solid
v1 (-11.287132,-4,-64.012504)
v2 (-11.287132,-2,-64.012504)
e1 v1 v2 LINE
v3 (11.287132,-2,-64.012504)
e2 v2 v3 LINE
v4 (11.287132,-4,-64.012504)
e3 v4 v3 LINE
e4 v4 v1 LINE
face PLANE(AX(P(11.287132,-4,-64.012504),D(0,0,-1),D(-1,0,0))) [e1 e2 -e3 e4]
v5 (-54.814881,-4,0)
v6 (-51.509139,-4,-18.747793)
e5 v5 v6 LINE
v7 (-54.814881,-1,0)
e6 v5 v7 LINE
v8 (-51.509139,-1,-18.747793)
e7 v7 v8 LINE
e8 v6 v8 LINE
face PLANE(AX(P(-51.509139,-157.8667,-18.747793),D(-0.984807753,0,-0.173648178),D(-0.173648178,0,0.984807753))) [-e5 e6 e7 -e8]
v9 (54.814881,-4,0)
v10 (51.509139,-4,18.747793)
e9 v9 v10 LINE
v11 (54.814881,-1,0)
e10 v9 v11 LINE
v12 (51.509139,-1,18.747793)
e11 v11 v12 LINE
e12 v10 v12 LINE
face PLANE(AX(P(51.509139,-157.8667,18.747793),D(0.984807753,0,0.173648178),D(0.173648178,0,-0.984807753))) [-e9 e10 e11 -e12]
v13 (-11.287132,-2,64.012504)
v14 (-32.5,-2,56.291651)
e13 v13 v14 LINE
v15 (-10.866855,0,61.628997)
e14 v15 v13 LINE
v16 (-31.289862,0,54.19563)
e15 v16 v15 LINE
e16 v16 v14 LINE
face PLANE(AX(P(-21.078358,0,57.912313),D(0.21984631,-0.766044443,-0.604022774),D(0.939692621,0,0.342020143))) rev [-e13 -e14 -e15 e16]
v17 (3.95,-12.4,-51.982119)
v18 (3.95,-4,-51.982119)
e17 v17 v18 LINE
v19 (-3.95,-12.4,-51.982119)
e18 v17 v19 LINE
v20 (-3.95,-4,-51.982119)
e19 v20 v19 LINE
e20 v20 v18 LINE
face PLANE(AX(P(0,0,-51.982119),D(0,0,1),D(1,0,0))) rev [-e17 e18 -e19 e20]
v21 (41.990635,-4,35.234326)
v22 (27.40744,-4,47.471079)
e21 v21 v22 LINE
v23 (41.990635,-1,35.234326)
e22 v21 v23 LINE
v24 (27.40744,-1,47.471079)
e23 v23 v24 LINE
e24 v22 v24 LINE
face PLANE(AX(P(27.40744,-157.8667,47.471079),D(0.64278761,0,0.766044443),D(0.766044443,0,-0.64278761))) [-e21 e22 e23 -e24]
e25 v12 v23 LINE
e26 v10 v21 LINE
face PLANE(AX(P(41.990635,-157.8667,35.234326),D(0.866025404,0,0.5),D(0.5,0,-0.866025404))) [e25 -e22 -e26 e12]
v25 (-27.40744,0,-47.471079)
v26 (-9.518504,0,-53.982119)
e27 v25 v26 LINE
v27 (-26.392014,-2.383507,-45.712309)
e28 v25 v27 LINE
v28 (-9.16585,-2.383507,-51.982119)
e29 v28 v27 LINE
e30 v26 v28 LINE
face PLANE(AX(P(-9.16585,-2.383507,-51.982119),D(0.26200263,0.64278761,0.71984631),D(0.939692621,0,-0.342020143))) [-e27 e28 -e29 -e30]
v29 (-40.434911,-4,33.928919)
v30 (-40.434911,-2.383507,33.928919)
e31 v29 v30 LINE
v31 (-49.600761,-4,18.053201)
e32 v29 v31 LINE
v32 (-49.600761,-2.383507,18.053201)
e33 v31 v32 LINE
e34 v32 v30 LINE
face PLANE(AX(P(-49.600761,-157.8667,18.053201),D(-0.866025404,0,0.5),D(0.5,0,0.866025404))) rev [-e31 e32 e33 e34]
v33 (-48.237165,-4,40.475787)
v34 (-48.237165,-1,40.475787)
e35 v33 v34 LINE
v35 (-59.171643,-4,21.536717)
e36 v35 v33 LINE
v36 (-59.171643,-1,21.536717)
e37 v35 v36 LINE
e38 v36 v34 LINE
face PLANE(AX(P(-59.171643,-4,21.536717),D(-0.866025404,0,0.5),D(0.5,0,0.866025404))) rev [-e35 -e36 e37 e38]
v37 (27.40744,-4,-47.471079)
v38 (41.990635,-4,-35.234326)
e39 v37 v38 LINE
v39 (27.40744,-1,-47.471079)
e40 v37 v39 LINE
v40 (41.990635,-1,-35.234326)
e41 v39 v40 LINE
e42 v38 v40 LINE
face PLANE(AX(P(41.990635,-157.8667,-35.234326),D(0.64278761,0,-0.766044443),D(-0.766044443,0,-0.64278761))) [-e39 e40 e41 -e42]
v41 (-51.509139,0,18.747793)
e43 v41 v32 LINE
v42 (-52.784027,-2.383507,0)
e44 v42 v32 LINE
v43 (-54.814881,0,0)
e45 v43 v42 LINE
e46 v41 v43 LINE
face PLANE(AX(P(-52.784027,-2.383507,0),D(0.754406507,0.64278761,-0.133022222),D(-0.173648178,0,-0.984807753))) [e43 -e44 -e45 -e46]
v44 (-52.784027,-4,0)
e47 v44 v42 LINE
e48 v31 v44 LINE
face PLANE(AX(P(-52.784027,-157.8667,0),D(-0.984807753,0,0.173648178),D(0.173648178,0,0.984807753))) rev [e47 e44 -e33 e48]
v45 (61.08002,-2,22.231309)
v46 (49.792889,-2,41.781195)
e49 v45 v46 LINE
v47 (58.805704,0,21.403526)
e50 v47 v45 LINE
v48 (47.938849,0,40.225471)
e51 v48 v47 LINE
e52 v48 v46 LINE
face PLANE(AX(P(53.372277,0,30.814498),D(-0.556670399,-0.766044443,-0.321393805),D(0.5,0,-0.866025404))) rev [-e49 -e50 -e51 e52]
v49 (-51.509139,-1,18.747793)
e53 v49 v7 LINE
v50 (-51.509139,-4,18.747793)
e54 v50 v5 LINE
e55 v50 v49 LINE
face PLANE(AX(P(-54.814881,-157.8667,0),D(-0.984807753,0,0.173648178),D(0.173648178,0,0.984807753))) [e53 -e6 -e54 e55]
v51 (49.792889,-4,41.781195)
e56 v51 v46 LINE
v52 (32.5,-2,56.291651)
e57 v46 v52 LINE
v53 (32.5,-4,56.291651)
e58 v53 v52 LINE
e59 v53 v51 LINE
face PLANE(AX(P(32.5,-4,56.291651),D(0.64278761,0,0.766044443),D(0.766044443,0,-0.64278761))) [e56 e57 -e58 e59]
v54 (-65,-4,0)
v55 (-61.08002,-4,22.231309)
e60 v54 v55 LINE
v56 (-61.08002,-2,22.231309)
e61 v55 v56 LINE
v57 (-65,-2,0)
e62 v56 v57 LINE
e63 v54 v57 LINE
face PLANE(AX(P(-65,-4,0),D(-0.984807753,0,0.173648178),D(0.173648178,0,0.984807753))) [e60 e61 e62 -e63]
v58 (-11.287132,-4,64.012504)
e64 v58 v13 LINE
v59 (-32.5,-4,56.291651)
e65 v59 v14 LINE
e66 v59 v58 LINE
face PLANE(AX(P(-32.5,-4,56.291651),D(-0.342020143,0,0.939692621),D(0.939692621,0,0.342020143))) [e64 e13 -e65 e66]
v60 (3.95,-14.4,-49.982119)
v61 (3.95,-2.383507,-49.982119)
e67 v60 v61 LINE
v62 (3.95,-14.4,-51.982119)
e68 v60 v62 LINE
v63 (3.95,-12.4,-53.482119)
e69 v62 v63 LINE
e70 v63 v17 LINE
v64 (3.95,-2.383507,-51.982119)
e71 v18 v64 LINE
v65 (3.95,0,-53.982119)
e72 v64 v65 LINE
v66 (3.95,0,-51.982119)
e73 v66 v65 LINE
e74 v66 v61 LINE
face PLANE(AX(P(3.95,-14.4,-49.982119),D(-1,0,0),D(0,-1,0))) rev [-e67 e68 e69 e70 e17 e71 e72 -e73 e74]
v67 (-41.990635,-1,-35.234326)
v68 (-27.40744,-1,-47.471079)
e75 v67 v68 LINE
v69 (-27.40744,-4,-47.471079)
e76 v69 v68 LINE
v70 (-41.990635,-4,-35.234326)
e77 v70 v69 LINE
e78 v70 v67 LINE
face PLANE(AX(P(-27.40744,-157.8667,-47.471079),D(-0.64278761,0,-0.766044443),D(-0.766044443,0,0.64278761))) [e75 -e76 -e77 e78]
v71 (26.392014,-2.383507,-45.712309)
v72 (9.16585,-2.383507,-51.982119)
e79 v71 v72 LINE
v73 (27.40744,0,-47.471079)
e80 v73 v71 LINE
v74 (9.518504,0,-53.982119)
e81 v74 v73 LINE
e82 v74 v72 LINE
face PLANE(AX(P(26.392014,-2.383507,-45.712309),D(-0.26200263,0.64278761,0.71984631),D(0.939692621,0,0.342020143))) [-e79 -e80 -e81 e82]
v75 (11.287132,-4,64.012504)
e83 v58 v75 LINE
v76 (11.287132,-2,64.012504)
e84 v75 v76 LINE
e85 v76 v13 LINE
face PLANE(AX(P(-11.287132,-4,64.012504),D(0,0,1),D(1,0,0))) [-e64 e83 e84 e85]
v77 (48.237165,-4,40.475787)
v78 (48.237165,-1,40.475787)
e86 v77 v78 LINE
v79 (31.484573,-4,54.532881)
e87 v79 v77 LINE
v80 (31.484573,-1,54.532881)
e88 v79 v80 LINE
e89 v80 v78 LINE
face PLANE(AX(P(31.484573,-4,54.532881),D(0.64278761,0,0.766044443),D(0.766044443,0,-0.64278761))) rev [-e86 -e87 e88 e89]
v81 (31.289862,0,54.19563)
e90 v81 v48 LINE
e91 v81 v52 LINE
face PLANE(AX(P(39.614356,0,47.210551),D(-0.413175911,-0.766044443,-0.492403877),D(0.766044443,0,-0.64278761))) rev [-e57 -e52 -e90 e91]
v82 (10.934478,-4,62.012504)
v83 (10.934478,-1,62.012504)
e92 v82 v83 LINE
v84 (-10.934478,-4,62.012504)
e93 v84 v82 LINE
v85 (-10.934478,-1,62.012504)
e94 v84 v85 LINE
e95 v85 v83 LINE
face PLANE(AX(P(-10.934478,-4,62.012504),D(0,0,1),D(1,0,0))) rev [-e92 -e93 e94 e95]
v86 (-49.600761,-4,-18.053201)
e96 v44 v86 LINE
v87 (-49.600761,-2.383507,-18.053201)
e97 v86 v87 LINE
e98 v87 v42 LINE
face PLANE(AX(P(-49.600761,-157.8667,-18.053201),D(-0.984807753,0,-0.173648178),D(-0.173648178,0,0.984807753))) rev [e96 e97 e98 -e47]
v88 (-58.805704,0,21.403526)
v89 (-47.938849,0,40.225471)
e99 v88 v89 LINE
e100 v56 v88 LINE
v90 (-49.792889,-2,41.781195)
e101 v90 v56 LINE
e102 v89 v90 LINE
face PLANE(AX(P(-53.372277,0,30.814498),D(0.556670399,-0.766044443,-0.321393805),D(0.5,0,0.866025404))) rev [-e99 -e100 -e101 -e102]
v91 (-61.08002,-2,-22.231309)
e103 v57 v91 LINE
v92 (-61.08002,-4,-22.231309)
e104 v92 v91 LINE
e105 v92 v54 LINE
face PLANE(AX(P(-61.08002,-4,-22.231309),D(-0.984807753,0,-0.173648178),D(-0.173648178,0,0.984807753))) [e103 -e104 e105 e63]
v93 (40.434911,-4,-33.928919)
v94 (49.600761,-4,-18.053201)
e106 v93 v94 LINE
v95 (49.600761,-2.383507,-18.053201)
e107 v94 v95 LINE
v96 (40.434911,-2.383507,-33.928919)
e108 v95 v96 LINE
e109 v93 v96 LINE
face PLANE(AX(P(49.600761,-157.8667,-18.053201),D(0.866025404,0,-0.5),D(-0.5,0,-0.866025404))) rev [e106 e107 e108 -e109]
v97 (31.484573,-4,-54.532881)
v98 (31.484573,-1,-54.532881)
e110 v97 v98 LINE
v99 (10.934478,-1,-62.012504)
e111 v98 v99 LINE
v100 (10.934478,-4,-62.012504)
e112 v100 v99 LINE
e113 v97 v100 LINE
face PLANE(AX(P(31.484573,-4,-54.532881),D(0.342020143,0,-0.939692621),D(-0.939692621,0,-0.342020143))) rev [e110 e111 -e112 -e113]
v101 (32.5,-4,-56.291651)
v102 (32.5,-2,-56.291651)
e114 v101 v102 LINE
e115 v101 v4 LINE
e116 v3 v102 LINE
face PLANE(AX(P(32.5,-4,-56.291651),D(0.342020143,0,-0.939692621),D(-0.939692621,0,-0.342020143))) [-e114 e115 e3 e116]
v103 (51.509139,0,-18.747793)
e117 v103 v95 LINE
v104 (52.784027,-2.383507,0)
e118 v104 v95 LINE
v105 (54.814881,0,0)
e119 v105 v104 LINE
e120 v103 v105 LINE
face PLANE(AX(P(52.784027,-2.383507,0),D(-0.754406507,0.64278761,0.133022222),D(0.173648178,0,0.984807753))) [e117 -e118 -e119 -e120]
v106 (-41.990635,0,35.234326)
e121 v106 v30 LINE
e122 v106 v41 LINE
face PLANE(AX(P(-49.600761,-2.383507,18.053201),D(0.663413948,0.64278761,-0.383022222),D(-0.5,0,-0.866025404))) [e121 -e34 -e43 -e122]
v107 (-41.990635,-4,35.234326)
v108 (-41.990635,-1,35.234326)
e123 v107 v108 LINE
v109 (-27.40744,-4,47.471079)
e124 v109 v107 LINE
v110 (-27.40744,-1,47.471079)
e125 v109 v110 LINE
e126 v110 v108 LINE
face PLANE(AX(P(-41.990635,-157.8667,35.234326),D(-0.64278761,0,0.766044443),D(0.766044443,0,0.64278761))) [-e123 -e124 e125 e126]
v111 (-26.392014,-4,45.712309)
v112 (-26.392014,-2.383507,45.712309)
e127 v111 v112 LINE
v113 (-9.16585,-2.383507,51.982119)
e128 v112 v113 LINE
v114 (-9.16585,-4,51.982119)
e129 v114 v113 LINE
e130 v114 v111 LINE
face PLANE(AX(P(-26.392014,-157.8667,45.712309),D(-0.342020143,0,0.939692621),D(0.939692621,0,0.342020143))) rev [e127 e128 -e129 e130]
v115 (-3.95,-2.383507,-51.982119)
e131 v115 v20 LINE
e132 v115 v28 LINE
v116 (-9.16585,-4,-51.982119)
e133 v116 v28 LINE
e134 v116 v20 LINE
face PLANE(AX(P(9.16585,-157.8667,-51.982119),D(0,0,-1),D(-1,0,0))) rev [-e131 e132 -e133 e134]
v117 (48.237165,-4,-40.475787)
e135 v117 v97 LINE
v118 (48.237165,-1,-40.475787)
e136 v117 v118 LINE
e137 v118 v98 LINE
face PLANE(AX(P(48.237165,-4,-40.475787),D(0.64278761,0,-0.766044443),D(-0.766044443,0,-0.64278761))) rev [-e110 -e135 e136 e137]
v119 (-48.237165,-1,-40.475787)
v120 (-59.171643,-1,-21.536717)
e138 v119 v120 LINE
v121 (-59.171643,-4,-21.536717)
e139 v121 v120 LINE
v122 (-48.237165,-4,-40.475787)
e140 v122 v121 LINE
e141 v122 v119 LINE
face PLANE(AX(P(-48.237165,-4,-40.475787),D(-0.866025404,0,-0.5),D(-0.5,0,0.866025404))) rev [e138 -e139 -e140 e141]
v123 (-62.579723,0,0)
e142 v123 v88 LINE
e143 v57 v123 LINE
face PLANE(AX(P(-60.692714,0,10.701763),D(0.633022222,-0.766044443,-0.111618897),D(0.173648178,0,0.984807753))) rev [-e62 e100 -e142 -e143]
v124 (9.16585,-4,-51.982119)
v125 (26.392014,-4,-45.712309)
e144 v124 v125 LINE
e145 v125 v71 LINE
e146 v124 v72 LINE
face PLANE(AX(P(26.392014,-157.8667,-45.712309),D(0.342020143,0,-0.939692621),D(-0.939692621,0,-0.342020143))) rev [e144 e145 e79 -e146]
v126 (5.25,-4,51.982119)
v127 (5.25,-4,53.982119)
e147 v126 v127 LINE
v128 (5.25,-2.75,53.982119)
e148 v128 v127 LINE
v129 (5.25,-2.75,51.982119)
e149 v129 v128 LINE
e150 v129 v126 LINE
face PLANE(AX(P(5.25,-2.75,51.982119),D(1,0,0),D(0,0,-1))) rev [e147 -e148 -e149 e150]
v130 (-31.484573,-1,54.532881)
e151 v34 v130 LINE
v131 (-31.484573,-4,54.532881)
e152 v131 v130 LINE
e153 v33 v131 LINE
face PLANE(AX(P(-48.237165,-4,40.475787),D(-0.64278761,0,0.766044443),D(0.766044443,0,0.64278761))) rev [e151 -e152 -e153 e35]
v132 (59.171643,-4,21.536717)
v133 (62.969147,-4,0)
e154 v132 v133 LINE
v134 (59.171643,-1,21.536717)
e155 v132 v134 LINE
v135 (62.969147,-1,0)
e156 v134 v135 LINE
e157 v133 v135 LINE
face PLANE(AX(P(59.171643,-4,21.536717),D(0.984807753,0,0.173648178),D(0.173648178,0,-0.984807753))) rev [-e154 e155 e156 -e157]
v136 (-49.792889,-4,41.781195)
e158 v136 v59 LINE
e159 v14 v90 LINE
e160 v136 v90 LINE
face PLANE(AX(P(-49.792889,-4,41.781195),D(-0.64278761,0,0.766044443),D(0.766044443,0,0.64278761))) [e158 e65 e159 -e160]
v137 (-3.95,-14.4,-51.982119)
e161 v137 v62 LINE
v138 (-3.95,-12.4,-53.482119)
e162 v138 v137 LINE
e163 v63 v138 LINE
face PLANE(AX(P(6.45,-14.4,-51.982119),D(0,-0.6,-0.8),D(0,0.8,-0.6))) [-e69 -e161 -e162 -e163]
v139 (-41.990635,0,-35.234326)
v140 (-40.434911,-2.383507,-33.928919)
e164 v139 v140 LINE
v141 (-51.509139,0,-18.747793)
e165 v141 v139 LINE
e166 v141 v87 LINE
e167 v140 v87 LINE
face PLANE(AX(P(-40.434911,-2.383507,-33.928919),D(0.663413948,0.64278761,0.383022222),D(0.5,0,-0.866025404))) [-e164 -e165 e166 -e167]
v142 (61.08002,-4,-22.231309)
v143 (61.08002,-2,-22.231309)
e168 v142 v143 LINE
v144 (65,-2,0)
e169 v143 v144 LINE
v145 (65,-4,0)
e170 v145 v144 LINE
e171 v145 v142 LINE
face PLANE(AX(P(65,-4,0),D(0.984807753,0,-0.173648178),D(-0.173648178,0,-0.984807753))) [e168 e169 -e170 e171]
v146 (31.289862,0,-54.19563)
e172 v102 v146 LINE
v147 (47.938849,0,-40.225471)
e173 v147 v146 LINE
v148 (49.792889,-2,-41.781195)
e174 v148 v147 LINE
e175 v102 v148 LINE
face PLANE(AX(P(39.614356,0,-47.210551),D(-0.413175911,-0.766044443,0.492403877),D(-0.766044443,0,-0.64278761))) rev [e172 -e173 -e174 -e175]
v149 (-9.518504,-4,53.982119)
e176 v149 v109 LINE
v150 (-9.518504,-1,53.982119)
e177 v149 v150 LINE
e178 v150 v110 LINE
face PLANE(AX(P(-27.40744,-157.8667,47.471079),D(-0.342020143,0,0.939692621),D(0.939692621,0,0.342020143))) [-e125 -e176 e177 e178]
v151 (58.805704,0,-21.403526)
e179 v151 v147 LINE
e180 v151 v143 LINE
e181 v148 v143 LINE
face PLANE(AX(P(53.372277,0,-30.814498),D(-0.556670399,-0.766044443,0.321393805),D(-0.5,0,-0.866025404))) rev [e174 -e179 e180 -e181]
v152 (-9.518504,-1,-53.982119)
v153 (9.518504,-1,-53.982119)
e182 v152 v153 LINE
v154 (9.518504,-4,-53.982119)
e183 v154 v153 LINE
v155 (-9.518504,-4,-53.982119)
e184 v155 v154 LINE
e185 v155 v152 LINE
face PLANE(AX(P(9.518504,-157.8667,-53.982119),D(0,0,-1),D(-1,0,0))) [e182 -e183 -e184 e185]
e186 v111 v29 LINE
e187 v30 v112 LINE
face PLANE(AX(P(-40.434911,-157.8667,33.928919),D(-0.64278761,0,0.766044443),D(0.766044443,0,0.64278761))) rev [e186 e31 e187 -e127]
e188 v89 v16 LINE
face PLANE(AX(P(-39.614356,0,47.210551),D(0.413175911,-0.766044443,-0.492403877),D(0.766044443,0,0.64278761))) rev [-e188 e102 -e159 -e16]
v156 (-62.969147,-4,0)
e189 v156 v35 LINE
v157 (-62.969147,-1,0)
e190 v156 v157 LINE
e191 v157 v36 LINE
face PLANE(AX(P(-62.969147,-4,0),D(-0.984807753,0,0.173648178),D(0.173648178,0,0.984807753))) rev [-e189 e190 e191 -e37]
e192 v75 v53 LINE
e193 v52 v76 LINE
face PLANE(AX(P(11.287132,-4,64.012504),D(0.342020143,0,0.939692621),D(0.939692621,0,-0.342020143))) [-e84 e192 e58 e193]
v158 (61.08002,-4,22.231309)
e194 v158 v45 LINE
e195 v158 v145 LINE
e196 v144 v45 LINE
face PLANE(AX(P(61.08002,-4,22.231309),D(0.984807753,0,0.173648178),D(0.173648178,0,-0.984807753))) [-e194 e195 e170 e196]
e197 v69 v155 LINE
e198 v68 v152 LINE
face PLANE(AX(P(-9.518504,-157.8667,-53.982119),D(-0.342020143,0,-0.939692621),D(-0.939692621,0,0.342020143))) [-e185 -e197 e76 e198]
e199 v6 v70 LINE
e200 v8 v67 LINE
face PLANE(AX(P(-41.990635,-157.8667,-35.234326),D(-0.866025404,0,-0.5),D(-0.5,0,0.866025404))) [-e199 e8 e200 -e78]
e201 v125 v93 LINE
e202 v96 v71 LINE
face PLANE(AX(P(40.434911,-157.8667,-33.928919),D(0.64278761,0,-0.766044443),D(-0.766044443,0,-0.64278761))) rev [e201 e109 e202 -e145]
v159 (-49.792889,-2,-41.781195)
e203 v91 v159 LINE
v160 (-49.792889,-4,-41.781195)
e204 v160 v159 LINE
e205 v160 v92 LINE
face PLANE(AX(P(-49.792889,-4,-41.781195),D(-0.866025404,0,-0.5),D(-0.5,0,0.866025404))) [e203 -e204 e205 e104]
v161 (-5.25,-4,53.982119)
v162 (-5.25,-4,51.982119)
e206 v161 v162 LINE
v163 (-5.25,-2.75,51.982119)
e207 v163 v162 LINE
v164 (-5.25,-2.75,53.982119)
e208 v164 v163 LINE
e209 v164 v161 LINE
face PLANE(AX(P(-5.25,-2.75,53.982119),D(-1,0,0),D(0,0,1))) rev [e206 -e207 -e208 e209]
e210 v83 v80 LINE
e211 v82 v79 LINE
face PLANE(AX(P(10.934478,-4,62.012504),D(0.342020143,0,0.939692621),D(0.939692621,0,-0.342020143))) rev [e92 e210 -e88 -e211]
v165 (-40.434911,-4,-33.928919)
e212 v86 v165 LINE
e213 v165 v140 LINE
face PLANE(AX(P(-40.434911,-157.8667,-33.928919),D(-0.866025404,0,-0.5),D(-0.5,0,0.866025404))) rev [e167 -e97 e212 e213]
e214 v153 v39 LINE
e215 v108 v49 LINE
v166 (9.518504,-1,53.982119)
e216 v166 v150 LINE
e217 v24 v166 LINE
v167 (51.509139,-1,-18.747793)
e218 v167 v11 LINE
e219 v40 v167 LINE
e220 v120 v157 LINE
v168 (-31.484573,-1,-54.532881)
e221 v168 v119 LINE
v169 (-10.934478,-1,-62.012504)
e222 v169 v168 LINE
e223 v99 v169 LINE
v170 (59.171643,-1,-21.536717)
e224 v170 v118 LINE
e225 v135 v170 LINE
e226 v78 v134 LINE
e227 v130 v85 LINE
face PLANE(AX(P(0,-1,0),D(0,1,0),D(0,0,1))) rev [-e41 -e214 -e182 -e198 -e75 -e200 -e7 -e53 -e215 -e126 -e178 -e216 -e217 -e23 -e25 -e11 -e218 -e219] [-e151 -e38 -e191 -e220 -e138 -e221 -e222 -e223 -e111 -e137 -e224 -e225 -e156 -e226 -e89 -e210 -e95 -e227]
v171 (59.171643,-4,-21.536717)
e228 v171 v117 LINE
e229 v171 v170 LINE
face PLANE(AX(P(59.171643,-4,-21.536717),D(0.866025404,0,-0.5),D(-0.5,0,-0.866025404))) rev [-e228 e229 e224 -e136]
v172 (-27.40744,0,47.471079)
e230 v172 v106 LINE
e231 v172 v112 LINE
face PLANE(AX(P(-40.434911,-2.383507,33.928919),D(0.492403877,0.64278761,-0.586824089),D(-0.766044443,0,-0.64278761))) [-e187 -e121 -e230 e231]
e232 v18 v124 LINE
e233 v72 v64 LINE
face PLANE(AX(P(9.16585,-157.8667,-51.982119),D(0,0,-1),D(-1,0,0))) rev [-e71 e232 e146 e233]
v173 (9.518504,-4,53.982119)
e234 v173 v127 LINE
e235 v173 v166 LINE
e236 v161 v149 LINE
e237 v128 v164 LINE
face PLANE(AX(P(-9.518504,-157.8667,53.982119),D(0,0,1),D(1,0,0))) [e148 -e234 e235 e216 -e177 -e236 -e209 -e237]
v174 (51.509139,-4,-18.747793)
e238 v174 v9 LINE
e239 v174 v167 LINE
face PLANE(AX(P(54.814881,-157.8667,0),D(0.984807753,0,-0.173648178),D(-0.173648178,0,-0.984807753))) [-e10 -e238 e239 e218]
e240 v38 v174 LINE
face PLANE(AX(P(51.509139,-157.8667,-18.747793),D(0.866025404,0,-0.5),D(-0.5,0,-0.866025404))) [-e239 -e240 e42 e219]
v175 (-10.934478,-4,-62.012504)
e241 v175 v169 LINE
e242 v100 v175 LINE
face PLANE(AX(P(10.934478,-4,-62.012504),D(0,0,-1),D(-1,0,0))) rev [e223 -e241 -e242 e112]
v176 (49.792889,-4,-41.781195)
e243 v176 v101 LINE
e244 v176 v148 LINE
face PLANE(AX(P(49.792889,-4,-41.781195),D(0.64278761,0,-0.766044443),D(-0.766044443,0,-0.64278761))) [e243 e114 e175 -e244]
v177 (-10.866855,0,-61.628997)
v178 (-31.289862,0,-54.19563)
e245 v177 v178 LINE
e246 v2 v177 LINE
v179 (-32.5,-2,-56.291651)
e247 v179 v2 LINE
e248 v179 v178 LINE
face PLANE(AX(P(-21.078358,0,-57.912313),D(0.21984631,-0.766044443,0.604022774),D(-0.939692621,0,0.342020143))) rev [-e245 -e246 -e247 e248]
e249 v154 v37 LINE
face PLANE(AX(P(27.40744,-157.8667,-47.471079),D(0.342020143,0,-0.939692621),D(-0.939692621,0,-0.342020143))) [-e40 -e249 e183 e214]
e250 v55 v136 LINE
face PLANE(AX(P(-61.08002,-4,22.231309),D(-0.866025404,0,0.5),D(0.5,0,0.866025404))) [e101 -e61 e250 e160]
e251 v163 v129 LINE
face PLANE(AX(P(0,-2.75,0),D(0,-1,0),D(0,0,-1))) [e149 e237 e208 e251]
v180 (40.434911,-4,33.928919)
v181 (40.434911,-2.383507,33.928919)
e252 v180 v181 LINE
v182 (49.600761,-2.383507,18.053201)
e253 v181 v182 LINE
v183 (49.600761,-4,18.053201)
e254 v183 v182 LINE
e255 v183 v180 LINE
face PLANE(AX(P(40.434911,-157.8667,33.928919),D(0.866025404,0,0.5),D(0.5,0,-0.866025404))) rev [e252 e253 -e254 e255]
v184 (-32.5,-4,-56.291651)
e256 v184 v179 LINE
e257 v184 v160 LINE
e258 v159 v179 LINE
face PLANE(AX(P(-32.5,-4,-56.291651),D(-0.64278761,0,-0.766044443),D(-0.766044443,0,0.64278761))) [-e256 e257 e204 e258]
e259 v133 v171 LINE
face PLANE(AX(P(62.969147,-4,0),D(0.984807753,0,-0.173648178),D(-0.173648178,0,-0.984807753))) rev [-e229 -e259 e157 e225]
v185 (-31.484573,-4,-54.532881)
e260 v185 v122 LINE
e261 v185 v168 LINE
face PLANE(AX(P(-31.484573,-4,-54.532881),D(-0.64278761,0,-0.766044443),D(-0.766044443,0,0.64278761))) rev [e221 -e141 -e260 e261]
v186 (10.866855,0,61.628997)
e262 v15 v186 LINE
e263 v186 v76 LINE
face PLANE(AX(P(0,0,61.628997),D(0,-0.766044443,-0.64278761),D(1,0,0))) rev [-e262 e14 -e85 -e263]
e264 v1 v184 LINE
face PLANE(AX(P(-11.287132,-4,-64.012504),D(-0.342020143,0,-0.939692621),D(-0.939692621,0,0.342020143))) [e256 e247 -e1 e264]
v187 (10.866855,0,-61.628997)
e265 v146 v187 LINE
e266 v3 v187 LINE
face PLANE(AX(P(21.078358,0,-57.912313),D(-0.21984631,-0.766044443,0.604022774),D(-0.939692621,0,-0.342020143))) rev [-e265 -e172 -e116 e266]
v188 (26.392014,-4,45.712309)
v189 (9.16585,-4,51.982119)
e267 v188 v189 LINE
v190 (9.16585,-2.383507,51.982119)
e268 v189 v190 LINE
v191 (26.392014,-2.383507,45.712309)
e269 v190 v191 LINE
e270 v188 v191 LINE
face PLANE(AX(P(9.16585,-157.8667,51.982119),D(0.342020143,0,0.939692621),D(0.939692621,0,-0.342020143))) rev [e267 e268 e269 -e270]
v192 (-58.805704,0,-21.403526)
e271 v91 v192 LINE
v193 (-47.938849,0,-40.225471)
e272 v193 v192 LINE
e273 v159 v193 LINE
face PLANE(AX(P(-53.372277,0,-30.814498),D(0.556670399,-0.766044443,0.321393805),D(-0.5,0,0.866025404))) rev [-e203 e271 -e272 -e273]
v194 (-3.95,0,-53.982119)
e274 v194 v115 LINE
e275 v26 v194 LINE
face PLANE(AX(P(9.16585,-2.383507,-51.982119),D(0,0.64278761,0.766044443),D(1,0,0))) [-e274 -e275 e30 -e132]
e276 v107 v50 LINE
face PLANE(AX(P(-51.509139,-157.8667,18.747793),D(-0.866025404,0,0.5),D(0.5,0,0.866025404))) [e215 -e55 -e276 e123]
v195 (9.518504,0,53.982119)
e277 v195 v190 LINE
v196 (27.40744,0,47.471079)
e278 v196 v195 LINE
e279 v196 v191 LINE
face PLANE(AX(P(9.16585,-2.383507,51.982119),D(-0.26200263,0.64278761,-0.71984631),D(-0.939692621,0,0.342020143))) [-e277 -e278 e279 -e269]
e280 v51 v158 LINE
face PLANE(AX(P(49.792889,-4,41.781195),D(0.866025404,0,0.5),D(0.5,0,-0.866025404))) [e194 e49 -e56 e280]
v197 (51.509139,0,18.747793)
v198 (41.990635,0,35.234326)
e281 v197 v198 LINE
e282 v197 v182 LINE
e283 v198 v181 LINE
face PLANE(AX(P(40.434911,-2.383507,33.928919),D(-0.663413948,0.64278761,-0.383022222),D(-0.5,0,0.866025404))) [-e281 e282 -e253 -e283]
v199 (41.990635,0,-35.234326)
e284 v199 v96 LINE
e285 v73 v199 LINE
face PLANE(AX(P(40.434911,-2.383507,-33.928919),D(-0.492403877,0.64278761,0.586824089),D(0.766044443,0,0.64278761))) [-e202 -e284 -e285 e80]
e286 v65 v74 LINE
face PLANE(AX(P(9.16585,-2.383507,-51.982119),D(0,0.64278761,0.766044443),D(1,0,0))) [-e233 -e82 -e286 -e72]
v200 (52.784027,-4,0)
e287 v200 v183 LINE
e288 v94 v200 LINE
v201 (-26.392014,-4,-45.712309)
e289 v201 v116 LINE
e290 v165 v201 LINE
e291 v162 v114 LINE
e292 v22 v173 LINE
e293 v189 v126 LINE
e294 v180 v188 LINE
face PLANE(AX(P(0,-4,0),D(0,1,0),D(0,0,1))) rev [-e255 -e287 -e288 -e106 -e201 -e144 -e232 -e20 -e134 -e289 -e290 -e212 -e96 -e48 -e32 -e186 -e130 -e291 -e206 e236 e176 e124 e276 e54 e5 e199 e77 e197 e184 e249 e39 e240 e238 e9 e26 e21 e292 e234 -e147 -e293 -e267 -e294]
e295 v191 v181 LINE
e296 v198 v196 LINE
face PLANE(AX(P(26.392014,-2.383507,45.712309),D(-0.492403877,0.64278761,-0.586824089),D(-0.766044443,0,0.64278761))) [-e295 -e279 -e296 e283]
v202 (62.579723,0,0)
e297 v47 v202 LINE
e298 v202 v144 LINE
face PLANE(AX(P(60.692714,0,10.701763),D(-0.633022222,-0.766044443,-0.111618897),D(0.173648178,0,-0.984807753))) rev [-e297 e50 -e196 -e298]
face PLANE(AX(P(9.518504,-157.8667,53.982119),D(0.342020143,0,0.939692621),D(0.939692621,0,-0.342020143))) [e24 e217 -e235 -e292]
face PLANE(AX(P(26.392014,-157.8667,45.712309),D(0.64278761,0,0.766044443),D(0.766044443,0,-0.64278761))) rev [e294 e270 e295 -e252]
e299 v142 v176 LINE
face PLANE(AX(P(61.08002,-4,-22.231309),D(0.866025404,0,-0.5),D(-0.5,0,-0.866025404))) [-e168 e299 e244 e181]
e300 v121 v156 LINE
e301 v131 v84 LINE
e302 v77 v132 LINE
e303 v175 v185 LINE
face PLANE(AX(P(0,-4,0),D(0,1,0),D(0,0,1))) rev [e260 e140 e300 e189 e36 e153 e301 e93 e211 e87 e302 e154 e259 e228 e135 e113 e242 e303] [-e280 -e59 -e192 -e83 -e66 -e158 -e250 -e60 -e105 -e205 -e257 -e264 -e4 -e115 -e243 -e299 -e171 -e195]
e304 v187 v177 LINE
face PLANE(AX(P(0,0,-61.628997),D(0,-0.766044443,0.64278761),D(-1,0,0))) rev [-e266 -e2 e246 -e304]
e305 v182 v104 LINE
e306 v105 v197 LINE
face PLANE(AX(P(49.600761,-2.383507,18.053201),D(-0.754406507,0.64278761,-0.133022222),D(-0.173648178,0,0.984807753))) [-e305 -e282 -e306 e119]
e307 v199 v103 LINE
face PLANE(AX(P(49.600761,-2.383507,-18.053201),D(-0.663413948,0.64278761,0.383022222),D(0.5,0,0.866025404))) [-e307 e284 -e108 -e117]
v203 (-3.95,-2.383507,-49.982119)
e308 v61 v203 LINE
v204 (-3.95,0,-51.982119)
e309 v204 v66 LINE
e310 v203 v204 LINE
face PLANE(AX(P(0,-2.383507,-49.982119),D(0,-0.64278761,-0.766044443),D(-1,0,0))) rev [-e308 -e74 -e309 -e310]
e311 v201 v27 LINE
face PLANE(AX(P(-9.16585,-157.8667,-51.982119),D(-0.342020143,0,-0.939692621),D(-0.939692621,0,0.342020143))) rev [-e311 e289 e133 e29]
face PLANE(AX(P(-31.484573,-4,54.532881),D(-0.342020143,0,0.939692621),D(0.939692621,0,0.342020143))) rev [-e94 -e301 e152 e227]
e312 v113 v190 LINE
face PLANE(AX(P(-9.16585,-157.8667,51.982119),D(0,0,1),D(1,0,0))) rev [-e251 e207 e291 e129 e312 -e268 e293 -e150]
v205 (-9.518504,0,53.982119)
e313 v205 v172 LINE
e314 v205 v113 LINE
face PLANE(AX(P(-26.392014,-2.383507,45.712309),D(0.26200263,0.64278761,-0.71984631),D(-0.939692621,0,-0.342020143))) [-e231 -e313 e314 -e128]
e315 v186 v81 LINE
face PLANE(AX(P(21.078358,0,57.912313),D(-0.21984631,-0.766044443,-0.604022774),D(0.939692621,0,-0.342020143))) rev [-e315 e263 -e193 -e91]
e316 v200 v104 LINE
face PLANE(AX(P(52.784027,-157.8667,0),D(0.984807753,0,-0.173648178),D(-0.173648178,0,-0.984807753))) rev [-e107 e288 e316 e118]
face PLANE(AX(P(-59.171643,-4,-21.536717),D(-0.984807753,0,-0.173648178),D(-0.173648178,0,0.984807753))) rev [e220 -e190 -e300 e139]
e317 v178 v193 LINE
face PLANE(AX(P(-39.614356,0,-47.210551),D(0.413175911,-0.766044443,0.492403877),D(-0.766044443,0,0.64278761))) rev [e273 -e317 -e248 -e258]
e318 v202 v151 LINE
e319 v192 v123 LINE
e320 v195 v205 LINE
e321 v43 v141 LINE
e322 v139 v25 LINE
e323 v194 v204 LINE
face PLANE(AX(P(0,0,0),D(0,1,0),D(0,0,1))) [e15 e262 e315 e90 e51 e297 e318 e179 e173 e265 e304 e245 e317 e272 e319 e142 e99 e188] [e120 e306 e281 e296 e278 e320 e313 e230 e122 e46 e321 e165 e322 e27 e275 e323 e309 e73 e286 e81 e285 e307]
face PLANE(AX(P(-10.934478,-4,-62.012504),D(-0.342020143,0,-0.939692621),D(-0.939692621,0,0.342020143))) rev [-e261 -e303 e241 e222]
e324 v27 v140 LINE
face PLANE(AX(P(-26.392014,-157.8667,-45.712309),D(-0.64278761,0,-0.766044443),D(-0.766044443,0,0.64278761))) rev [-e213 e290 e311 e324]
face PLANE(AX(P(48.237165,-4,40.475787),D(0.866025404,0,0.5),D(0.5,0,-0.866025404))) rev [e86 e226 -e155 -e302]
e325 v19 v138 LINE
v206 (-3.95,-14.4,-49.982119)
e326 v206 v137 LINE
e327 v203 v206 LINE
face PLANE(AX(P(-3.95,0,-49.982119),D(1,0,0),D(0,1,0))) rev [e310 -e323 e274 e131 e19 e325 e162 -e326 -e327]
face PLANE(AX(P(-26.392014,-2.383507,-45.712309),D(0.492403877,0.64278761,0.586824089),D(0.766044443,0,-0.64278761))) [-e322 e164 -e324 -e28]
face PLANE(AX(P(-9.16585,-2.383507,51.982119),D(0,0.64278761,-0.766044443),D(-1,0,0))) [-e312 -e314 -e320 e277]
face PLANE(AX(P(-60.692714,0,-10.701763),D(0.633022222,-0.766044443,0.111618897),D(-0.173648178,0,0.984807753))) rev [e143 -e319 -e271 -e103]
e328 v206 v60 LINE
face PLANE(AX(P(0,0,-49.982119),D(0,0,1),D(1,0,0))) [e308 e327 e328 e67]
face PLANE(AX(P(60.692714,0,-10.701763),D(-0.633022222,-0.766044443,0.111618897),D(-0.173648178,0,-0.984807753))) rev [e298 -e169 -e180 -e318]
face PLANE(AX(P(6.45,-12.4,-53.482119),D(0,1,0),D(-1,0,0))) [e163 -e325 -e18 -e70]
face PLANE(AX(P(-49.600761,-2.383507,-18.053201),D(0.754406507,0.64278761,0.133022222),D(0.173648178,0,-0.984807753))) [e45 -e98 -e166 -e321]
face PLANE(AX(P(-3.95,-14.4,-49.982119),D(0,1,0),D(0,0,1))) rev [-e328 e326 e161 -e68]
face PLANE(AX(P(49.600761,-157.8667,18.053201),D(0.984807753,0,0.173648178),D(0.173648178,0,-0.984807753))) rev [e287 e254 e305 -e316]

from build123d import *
from OCP.BRepFilletAPI import BRepFilletAPI_MakeChamfer

# Parameters (mm, degrees)
BOSS_EXTRUDE1_DEPTH = 1
BOSS_EXTRUDE3_DEPTH = 4
CUT_EXTRUDE2_DEPTH  = 1
BOSS_EXTRUDE5_DEPTH = 4
SKETCH6_W           = 10.5
SKETCH6_H           = 2
CUT_EXTRUDE3_DEPTH  = 1.25
SKETCH7_W           = 7.9
SKETCH7_H           = 14.4
BOSS_EXTRUDE6_DEPTH = 2
CHAMFER1_SIZE       = 2.383507185
CHAMFER1_SIZE_2     = 2
BOSS_EXTRUDE7_DEPTH = 7.9


with BuildPart() as part:
    # Sketch1 → Boss-Extrude1 (new body)
    with BuildSketch(Plane(origin=(0, 0, 0), x_dir=(1, 0, 0), z_dir=(0, 1, 0))):
        Polygon((62.969146776, 0), (59.171642563, 21.536716606), (48.237164976, 40.47578734), (31.484573388, 54.532880763), (10.934477587, 62.012503946), (-10.934477587, 62.012503946), (-31.484573388, 54.532880763), (-48.237164976, 40.47578734), (-59.171642563, 21.536716606), (-62.969146776, 0), (-59.171642563, -21.536716606), (-48.237164976, -40.47578734), (-31.484573388, -54.532880763), (-10.934477587, -62.012503946), (10.934477587, -62.012503946), (31.484573388, -54.532880763), (48.237164976, -40.47578734), (59.171642563, -21.536716606), align=None)
    extrude(amount=-BOSS_EXTRUDE1_DEPTH)

    # Sketch3 → Cut-Extrude2 (cut)
    with BuildSketch(Plane(origin=(0, 0, 0), x_dir=(1, 0, 0), z_dir=(0, 1, 0))):
        Polygon((54.814880655, 0), (51.509138861, 18.747793338), (41.990634726, 35.234326111), (27.407440327, 47.471079153), (9.518504135, 53.982119449), (-9.518504135, 53.982119449), (-27.407440328, 47.471079153), (-41.990634726, 35.234326111), (-51.509138861, 18.747793338), (-54.814880655, 0), (-51.509138861, -18.747793338), (-41.990634726, -35.234326111), (-27.407440327, -47.471079153), (-9.518504135, -53.982119449), (9.518504135, -53.982119449), (27.407440328, -47.471079153), (41.990634726, -35.234326111), (51.509138861, -18.747793338), align=None)
    extrude(amount=-CUT_EXTRUDE2_DEPTH, mode=Mode.SUBTRACT)


with BuildPart() as body_2:
    # Sketch1<7> → Boss-Extrude3 (new body)
    with BuildSketch(Plane(origin=(0, 0, 0), x_dir=(1, 0, 0), z_dir=(0, 1, 0))):
        Polygon((65, 0), (61.080020351, 22.231309316), (49.792888803, 41.78119463), (32.5, 56.291651246), (11.287131548, 64.012503946), (-11.287131548, 64.012503946), (-32.5, 56.291651246), (-49.792888803, 41.78119463), (-61.080020351, 22.231309316), (-65, 0), (-61.080020351, -22.231309316), (-49.792888803, -41.78119463), (-32.5, -56.291651246), (-11.287131548, -64.012503946), (11.287131548, -64.012503946), (32.5, -56.291651246), (49.792888803, -41.78119463), (61.080020351, -22.231309316), align=None)
        Polygon((62.969146776, 0), (59.171642563, 21.536716606), (48.237164976, 40.47578734), (31.484573388, 54.532880763), (10.934477587, 62.012503946), (-10.934477587, 62.012503946), (-31.484573388, 54.532880763), (-48.237164976, 40.47578734), (-59.171642563, 21.536716606), (-62.969146776, 0), (-59.171642563, -21.536716606), (-48.237164976, -40.47578734), (-31.484573388, -54.532880763), (-10.934477587, -62.012503946), (10.934477587, -62.012503946), (31.484573388, -54.532880763), (48.237164976, -40.47578734), (59.171642563, -21.536716606), align=None, mode=Mode.SUBTRACT)
    extrude(amount=-BOSS_EXTRUDE3_DEPTH)


    add(part.part)  # Boss-Extrude5 merges part
    # Sketch5 → Boss-Extrude5 (add)
    with BuildSketch(Plane(origin=(0, 0, 0), x_dir=(1, 0, 0), z_dir=(0, 1, 0))):
        Polygon((54.814880655, 0), (51.509138861, 18.747793338), (41.990634726, 35.234326111), (27.407440328, 47.471079153), (9.518504135, 53.982119449), (-9.518504135, 53.982119449), (-27.407440328, 47.471079153), (-41.990634726, 35.234326111), (-51.509138861, 18.747793338), (-54.814880655, 0), (-51.509138861, -18.747793338), (-41.990634726, -35.234326111), (-27.407440328, -47.471079153), (-9.518504135, -53.982119449), (9.518504135, -53.982119449), (27.407440328, -47.471079153), (41.990634726, -35.234326111), (51.509138861, -18.747793338), align=None)
        Polygon((52.784027431, 0), (49.600761072, 18.053200627), (40.434910899, 33.928918822), (26.392013716, 45.712308669), (9.165850173, 51.982119449), (-9.165850173, 51.982119449), (-26.392013716, 45.712308669), (-40.434910899, 33.928918822), (-49.600761072, 18.053200627), (-52.784027431, 0), (-49.600761072, -18.053200627), (-40.434910899, -33.928918822), (-26.392013716, -45.712308669), (-9.165850173, -51.982119449), (9.165850173, -51.982119449), (26.392013716, -45.712308669), (40.434910899, -33.928918822), (49.600761072, -18.053200627), align=None, mode=Mode.SUBTRACT)
    extrude(amount=-BOSS_EXTRUDE5_DEPTH)

    # Sketch6 → Cut-Extrude3 (cut)
    with BuildSketch(Plane.XZ.offset(4)):
        with Locations((0, 52.982119449)):
            Rectangle(SKETCH6_W, SKETCH6_H)
    extrude(amount=-CUT_EXTRUDE3_DEPTH, mode=Mode.SUBTRACT)

    # Sketch7 → Boss-Extrude6 (add)
    with BuildSketch(Plane.XY.offset(-51.982119449)):
        with Locations((0, -7.2)):
            Rectangle(SKETCH7_W, SKETCH7_H)
    extrude(amount=BOSS_EXTRUDE6_DEPTH)

    # Chamfer1
    chamfer1_edges_1 = [body_2.edges().sort_by_distance(p)[0] for p in [
        (55.436454577, 0, 32.006251973),
    ]]
    chamfer1_side_1 = [body_2.faces().sort_by_distance(p)[0] for p in [
        (55.401813561, 0, 31.986251973),
    ]]
    chamfer1_edges_2 = [body_2.edges().sort_by_distance(p)[0] for p in [
        (41.146444401, 0, 49.036422938),
    ]]
    chamfer1_side_2 = [body_2.faces().sort_by_distance(p)[0] for p in [
        (41.120732897, 0, 49.00578116),
    ]]
    chamfer1_edges_3 = [body_2.edges().sort_by_distance(p)[0] for p in [
        (21.893565774, 0, 60.152077596),
    ]]
    chamfer1_side_3 = [body_2.faces().sort_by_distance(p)[0] for p in [
        (21.879884968, 0, 60.114489891),
    ]]
    chamfer1_edges_4 = [body_2.edges().sort_by_distance(p)[0] for p in [
        (0, 0, 64.012503946),
    ]]
    chamfer1_side_4 = [body_2.faces().sort_by_distance(p)[0] for p in [
        (0, 0, 63.972503946),
    ]]
    chamfer1_edges_5 = [body_2.edges().sort_by_distance(p)[0] for p in [
        (-21.893565774, 0, 60.152077596),
    ]]
    chamfer1_side_5 = [body_2.faces().sort_by_distance(p)[0] for p in [
        (-21.879884968, 0, 60.114489891),
    ]]
    chamfer1_edges_6 = [body_2.edges().sort_by_distance(p)[0] for p in [
        (-41.146444401, 0, 49.036422938),
    ]]
    chamfer1_side_6 = [body_2.faces().sort_by_distance(p)[0] for p in [
        (-41.120732897, 0, 49.00578116),
    ]]
    chamfer1_edges_7 = [body_2.edges().sort_by_distance(p)[0] for p in [
        (51.192394252, 0, -9.026600314),
    ]]
    chamfer1_side_7 = [body_2.faces().sort_by_distance(p)[0] for p in [
        (51.231786562, 0, -9.033546241),
    ]]
    chamfer1_edges_8 = [body_2.edges().sort_by_distance(p)[0] for p in [
        (45.017835986, 0, -25.991059725),
    ]]
    chamfer1_side_8 = [body_2.faces().sort_by_distance(p)[0] for p in [
        (45.052477002, 0, -26.011059725),
    ]]
    chamfer1_edges_9 = [body_2.edges().sort_by_distance(p)[0] for p in [
        (33.413462307, 0, -39.820613746),
    ]]
    chamfer1_side_9 = [body_2.faces().sort_by_distance(p)[0] for p in [
        (33.439173812, 0, -39.851255524),
    ]]
    chamfer1_edges_10 = [body_2.edges().sort_by_distance(p)[0] for p in [
        (17.778931944, 0, -48.847214059),
    ]]
    chamfer1_side_10 = [body_2.faces().sort_by_distance(p)[0] for p in [
        (17.79261275, 0, -48.884801764),
    ]]
    chamfer1_edges_11 = [body_2.edges().sort_by_distance(p)[0] for p in [
        (6.557925087, 0, -51.982119449),
    ]]
    chamfer1_side_11 = [body_2.faces().sort_by_distance(p)[0] for p in [
        (6.557925087, 0, -52.022119449),
    ]]
    chamfer1_edges_12 = [body_2.edges().sort_by_distance(p)[0] for p in [
        (-17.778931944, 0, -48.847214059),
    ]]
    chamfer1_side_12 = [body_2.faces().sort_by_distance(p)[0] for p in [
        (-17.79261275, 0, -48.884801764),
    ]]
    chamfer1_edges_13 = [body_2.edges().sort_by_distance(p)[0] for p in [
        (-33.413462307, 0, -39.820613746),
    ]]
    chamfer1_side_13 = [body_2.faces().sort_by_distance(p)[0] for p in [
        (-33.439173812, 0, -39.851255524),
    ]]
    chamfer1_edges_14 = [body_2.edges().sort_by_distance(p)[0] for p in [
        (-45.017835986, 0, -25.991059725),
    ]]
    chamfer1_side_14 = [body_2.faces().sort_by_distance(p)[0] for p in [
        (-45.052477002, 0, -26.011059725),
    ]]
    chamfer1_edges_15 = [body_2.edges().sort_by_distance(p)[0] for p in [
        (-51.192394252, 0, -9.026600314),
    ]]
    chamfer1_side_15 = [body_2.faces().sort_by_distance(p)[0] for p in [
        (-51.231786562, 0, -9.033546241),
    ]]
    chamfer1_edges_16 = [body_2.edges().sort_by_distance(p)[0] for p in [
        (-51.192394252, 0, 9.026600314),
    ]]
    chamfer1_side_16 = [body_2.faces().sort_by_distance(p)[0] for p in [
        (-51.231786562, 0, 9.033546241),
    ]]
    chamfer1_edges_17 = [body_2.edges().sort_by_distance(p)[0] for p in [
        (-45.017835986, 0, 25.991059725),
    ]]
    chamfer1_side_17 = [body_2.faces().sort_by_distance(p)[0] for p in [
        (-45.052477002, 0, 26.011059725),
    ]]
    chamfer1_edges_18 = [body_2.edges().sort_by_distance(p)[0] for p in [
        (-33.413462307, 0, 39.820613746),
    ]]
    chamfer1_side_18 = [body_2.faces().sort_by_distance(p)[0] for p in [
        (-33.439173812, 0, 39.851255524),
    ]]
    chamfer1_edges_19 = [body_2.edges().sort_by_distance(p)[0] for p in [
        (-17.778931944, 0, 48.847214059),
    ]]
    chamfer1_side_19 = [body_2.faces().sort_by_distance(p)[0] for p in [
        (-17.79261275, 0, 48.884801764),
    ]]
    chamfer1_edges_20 = [body_2.edges().sort_by_distance(p)[0] for p in [
        (0, 0, 51.982119449),
    ]]
    chamfer1_side_20 = [body_2.faces().sort_by_distance(p)[0] for p in [
        (0, 0, 52.022119449),
    ]]
    chamfer1_edges_21 = [body_2.edges().sort_by_distance(p)[0] for p in [
        (17.778931944, 0, 48.847214059),
    ]]
    chamfer1_side_21 = [body_2.faces().sort_by_distance(p)[0] for p in [
        (17.79261275, 0, 48.884801764),
    ]]
    chamfer1_edges_22 = [body_2.edges().sort_by_distance(p)[0] for p in [
        (33.413462307, 0, 39.820613746),
    ]]
    chamfer1_side_22 = [body_2.faces().sort_by_distance(p)[0] for p in [
        (33.439173812, 0, 39.851255524),
    ]]
    chamfer1_edges_23 = [body_2.edges().sort_by_distance(p)[0] for p in [
        (45.017835986, 0, 25.991059725),
    ]]
    chamfer1_side_23 = [body_2.faces().sort_by_distance(p)[0] for p in [
        (45.052477002, 0, 26.011059725),
    ]]
    chamfer1_edges_24 = [body_2.edges().sort_by_distance(p)[0] for p in [
        (51.192394252, 0, 9.026600314),
    ]]
    chamfer1_side_24 = [body_2.faces().sort_by_distance(p)[0] for p in [
        (51.231786562, 0, 9.033546241),
    ]]
    chamfer1_edges_25 = [body_2.edges().sort_by_distance(p)[0] for p in [
        (-6.557925087, 0, -51.982119449),
    ]]
    chamfer1_side_25 = [body_2.faces().sort_by_distance(p)[0] for p in [
        (-6.557925087, 0, -52.022119449),
    ]]
    chamfer1_edges_26 = [body_2.edges().sort_by_distance(p)[0] for p in [
        (0, 0, -49.982119449),
    ]]
    chamfer1_side_26 = [body_2.faces().sort_by_distance(p)[0] for p in [
        (0, 0, -50.022119449),
    ]]
    chamfer1_edges_27 = [body_2.edges().sort_by_distance(p)[0] for p in [
        (-55.436454577, 0, 32.006251973),
    ]]
    chamfer1_side_27 = [body_2.faces().sort_by_distance(p)[0] for p in [
        (-55.401813561, 0, 31.986251973),
    ]]
    chamfer1_edges_28 = [body_2.edges().sort_by_distance(p)[0] for p in [
        (-63.040010176, 0, 11.115654658),
    ]]
    chamfer1_side_28 = [body_2.faces().sort_by_distance(p)[0] for p in [
        (-63.000617865, 0, 11.108708731),
    ]]
    chamfer1_edges_29 = [body_2.edges().sort_by_distance(p)[0] for p in [
        (-63.040010176, 0, -11.115654658),
    ]]
    chamfer1_side_29 = [body_2.faces().sort_by_distance(p)[0] for p in [
        (-63.000617865, 0, -11.108708731),
    ]]
    chamfer1_edges_30 = [body_2.edges().sort_by_distance(p)[0] for p in [
        (-55.436454577, 0, -32.006251973),
    ]]
    chamfer1_side_30 = [body_2.faces().sort_by_distance(p)[0] for p in [
        (-55.401813561, 0, -31.986251973),
    ]]
    chamfer1_edges_31 = [body_2.edges().sort_by_distance(p)[0] for p in [
        (-41.146444401, 0, -49.036422938),
    ]]
    chamfer1_side_31 = [body_2.faces().sort_by_distance(p)[0] for p in [
        (-41.120732897, 0, -49.00578116),
    ]]
    chamfer1_edges_32 = [body_2.edges().sort_by_distance(p)[0] for p in [
        (-21.893565774, 0, -60.152077596),
    ]]
    chamfer1_side_32 = [body_2.faces().sort_by_distance(p)[0] for p in [
        (-21.879884968, 0, -60.114489891),
    ]]
    chamfer1_edges_33 = [body_2.edges().sort_by_distance(p)[0] for p in [
        (0, 0, -64.012503946),
    ]]
    chamfer1_side_33 = [body_2.faces().sort_by_distance(p)[0] for p in [
        (0, 0, -63.972503946),
    ]]
    chamfer1_edges_34 = [body_2.edges().sort_by_distance(p)[0] for p in [
        (21.893565774, 0, -60.152077596),
    ]]
    chamfer1_side_34 = [body_2.faces().sort_by_distance(p)[0] for p in [
        (21.879884968, 0, -60.114489891),
    ]]
    chamfer1_edges_35 = [body_2.edges().sort_by_distance(p)[0] for p in [
        (41.146444401, 0, -49.036422938),
    ]]
    chamfer1_side_35 = [body_2.faces().sort_by_distance(p)[0] for p in [
        (41.120732897, 0, -49.00578116),
    ]]
    chamfer1_edges_36 = [body_2.edges().sort_by_distance(p)[0] for p in [
        (55.436454577, 0, -32.006251973),
    ]]
    chamfer1_side_36 = [body_2.faces().sort_by_distance(p)[0] for p in [
        (55.401813561, 0, -31.986251973),
    ]]
    chamfer1_edges_37 = [body_2.edges().sort_by_distance(p)[0] for p in [
        (63.040010176, 0, -11.115654658),
    ]]
    chamfer1_side_37 = [body_2.faces().sort_by_distance(p)[0] for p in [
        (63.000617865, 0, -11.108708731),
    ]]
    chamfer1_edges_38 = [body_2.edges().sort_by_distance(p)[0] for p in [
        (63.040010176, 0, 11.115654658),
    ]]
    chamfer1_side_38 = [body_2.faces().sort_by_distance(p)[0] for p in [
        (63.000617865, 0, 11.108708731),
    ]]
    chamfer1 = BRepFilletAPI_MakeChamfer(body_2.part.solid().wrapped)
    for e in chamfer1_edges_1:
        chamfer1.Add(CHAMFER1_SIZE - 0.0001, CHAMFER1_SIZE_2 - 0.0001, e.wrapped, chamfer1_side_1[0].wrapped)
    for e in chamfer1_edges_2:
        chamfer1.Add(CHAMFER1_SIZE - 0.0001, CHAMFER1_SIZE_2 - 0.0001, e.wrapped, chamfer1_side_2[0].wrapped)
    for e in chamfer1_edges_3:
        chamfer1.Add(CHAMFER1_SIZE - 0.0001, CHAMFER1_SIZE_2 - 0.0001, e.wrapped, chamfer1_side_3[0].wrapped)
    for e in chamfer1_edges_4:
        chamfer1.Add(CHAMFER1_SIZE - 0.0001, CHAMFER1_SIZE_2 - 0.0001, e.wrapped, chamfer1_side_4[0].wrapped)
    for e in chamfer1_edges_5:
        chamfer1.Add(CHAMFER1_SIZE - 0.0001, CHAMFER1_SIZE_2 - 0.0001, e.wrapped, chamfer1_side_5[0].wrapped)
    for e in chamfer1_edges_6:
        chamfer1.Add(CHAMFER1_SIZE - 0.0001, CHAMFER1_SIZE_2 - 0.0001, e.wrapped, chamfer1_side_6[0].wrapped)
    for e in chamfer1_edges_7:
        chamfer1.Add(CHAMFER1_SIZE_2 - 0.0001, CHAMFER1_SIZE - 0.0001, e.wrapped, chamfer1_side_7[0].wrapped)
    for e in chamfer1_edges_8:
        chamfer1.Add(CHAMFER1_SIZE_2 - 0.0001, CHAMFER1_SIZE - 0.0001, e.wrapped, chamfer1_side_8[0].wrapped)
    for e in chamfer1_edges_9:
        chamfer1.Add(CHAMFER1_SIZE_2 - 0.0001, CHAMFER1_SIZE - 0.0001, e.wrapped, chamfer1_side_9[0].wrapped)
    for e in chamfer1_edges_10:
        chamfer1.Add(CHAMFER1_SIZE_2 - 0.0001, CHAMFER1_SIZE - 0.0001, e.wrapped, chamfer1_side_10[0].wrapped)
    for e in chamfer1_edges_11:
        chamfer1.Add(CHAMFER1_SIZE_2 - 0.0001, CHAMFER1_SIZE - 0.0001, e.wrapped, chamfer1_side_11[0].wrapped)
    for e in chamfer1_edges_12:
        chamfer1.Add(CHAMFER1_SIZE_2 - 0.0001, CHAMFER1_SIZE - 0.0001, e.wrapped, chamfer1_side_12[0].wrapped)
    for e in chamfer1_edges_13:
        chamfer1.Add(CHAMFER1_SIZE_2 - 0.0001, CHAMFER1_SIZE - 0.0001, e.wrapped, chamfer1_side_13[0].wrapped)
    for e in chamfer1_edges_14:
        chamfer1.Add(CHAMFER1_SIZE_2 - 0.0001, CHAMFER1_SIZE - 0.0001, e.wrapped, chamfer1_side_14[0].wrapped)
    for e in chamfer1_edges_15:
        chamfer1.Add(CHAMFER1_SIZE_2 - 0.0001, CHAMFER1_SIZE - 0.0001, e.wrapped, chamfer1_side_15[0].wrapped)
    for e in chamfer1_edges_16:
        chamfer1.Add(CHAMFER1_SIZE_2 - 0.0001, CHAMFER1_SIZE - 0.0001, e.wrapped, chamfer1_side_16[0].wrapped)
    for e in chamfer1_edges_17:
        chamfer1.Add(CHAMFER1_SIZE_2 - 0.0001, CHAMFER1_SIZE - 0.0001, e.wrapped, chamfer1_side_17[0].wrapped)
    for e in chamfer1_edges_18:
        chamfer1.Add(CHAMFER1_SIZE_2 - 0.0001, CHAMFER1_SIZE - 0.0001, e.wrapped, chamfer1_side_18[0].wrapped)
    for e in chamfer1_edges_19:
        chamfer1.Add(CHAMFER1_SIZE_2 - 0.0001, CHAMFER1_SIZE - 0.0001, e.wrapped, chamfer1_side_19[0].wrapped)
    for e in chamfer1_edges_20:
        chamfer1.Add(CHAMFER1_SIZE_2 - 0.0001, CHAMFER1_SIZE - 0.0001, e.wrapped, chamfer1_side_20[0].wrapped)
    for e in chamfer1_edges_21:
        chamfer1.Add(CHAMFER1_SIZE_2 - 0.0001, CHAMFER1_SIZE - 0.0001, e.wrapped, chamfer1_side_21[0].wrapped)
    for e in chamfer1_edges_22:
        chamfer1.Add(CHAMFER1_SIZE_2 - 0.0001, CHAMFER1_SIZE - 0.0001, e.wrapped, chamfer1_side_22[0].wrapped)
    for e in chamfer1_edges_23:
        chamfer1.Add(CHAMFER1_SIZE_2 - 0.0001, CHAMFER1_SIZE - 0.0001, e.wrapped, chamfer1_side_23[0].wrapped)
    for e in chamfer1_edges_24:
        chamfer1.Add(CHAMFER1_SIZE_2 - 0.0001, CHAMFER1_SIZE - 0.0001, e.wrapped, chamfer1_side_24[0].wrapped)
    for e in chamfer1_edges_25:
        chamfer1.Add(CHAMFER1_SIZE_2 - 0.0001, CHAMFER1_SIZE - 0.0001, e.wrapped, chamfer1_side_25[0].wrapped)
    for e in chamfer1_edges_26:
        chamfer1.Add(CHAMFER1_SIZE_2 - 0.0001, CHAMFER1_SIZE - 0.0001, e.wrapped, chamfer1_side_26[0].wrapped)
    for e in chamfer1_edges_27:
        chamfer1.Add(CHAMFER1_SIZE - 0.0001, CHAMFER1_SIZE_2 - 0.0001, e.wrapped, chamfer1_side_27[0].wrapped)
    for e in chamfer1_edges_28:
        chamfer1.Add(CHAMFER1_SIZE - 0.0001, CHAMFER1_SIZE_2 - 0.0001, e.wrapped, chamfer1_side_28[0].wrapped)
    for e in chamfer1_edges_29:
        chamfer1.Add(CHAMFER1_SIZE - 0.0001, CHAMFER1_SIZE_2 - 0.0001, e.wrapped, chamfer1_side_29[0].wrapped)
    for e in chamfer1_edges_30:
        chamfer1.Add(CHAMFER1_SIZE - 0.0001, CHAMFER1_SIZE_2 - 0.0001, e.wrapped, chamfer1_side_30[0].wrapped)
    for e in chamfer1_edges_31:
        chamfer1.Add(CHAMFER1_SIZE - 0.0001, CHAMFER1_SIZE_2 - 0.0001, e.wrapped, chamfer1_side_31[0].wrapped)
    for e in chamfer1_edges_32:
        chamfer1.Add(CHAMFER1_SIZE - 0.0001, CHAMFER1_SIZE_2 - 0.0001, e.wrapped, chamfer1_side_32[0].wrapped)
    for e in chamfer1_edges_33:
        chamfer1.Add(CHAMFER1_SIZE - 0.0001, CHAMFER1_SIZE_2 - 0.0001, e.wrapped, chamfer1_side_33[0].wrapped)
    for e in chamfer1_edges_34:
        chamfer1.Add(CHAMFER1_SIZE - 0.0001, CHAMFER1_SIZE_2 - 0.0001, e.wrapped, chamfer1_side_34[0].wrapped)
    for e in chamfer1_edges_35:
        chamfer1.Add(CHAMFER1_SIZE - 0.0001, CHAMFER1_SIZE_2 - 0.0001, e.wrapped, chamfer1_side_35[0].wrapped)
    for e in chamfer1_edges_36:
        chamfer1.Add(CHAMFER1_SIZE - 0.0001, CHAMFER1_SIZE_2 - 0.0001, e.wrapped, chamfer1_side_36[0].wrapped)
    for e in chamfer1_edges_37:
        chamfer1.Add(CHAMFER1_SIZE - 0.0001, CHAMFER1_SIZE_2 - 0.0001, e.wrapped, chamfer1_side_37[0].wrapped)
    for e in chamfer1_edges_38:
        chamfer1.Add(CHAMFER1_SIZE - 0.0001, CHAMFER1_SIZE_2 - 0.0001, e.wrapped, chamfer1_side_38[0].wrapped)
    add(Compound.cast(chamfer1.Shape()), mode=Mode.REPLACE)  # a hair under: the kernel refuses the full size

    # Sketch9 → Boss-Extrude7 (add)
    with BuildSketch(Plane.ZY.offset(3.95)):
        Polygon((-51.982119449, -14.4), (-53.482119449, -12.4), (-51.982119449, -12.4), align=None)
    extrude(amount=-BOSS_EXTRUDE7_DEPTH)


solid = body_2.part
